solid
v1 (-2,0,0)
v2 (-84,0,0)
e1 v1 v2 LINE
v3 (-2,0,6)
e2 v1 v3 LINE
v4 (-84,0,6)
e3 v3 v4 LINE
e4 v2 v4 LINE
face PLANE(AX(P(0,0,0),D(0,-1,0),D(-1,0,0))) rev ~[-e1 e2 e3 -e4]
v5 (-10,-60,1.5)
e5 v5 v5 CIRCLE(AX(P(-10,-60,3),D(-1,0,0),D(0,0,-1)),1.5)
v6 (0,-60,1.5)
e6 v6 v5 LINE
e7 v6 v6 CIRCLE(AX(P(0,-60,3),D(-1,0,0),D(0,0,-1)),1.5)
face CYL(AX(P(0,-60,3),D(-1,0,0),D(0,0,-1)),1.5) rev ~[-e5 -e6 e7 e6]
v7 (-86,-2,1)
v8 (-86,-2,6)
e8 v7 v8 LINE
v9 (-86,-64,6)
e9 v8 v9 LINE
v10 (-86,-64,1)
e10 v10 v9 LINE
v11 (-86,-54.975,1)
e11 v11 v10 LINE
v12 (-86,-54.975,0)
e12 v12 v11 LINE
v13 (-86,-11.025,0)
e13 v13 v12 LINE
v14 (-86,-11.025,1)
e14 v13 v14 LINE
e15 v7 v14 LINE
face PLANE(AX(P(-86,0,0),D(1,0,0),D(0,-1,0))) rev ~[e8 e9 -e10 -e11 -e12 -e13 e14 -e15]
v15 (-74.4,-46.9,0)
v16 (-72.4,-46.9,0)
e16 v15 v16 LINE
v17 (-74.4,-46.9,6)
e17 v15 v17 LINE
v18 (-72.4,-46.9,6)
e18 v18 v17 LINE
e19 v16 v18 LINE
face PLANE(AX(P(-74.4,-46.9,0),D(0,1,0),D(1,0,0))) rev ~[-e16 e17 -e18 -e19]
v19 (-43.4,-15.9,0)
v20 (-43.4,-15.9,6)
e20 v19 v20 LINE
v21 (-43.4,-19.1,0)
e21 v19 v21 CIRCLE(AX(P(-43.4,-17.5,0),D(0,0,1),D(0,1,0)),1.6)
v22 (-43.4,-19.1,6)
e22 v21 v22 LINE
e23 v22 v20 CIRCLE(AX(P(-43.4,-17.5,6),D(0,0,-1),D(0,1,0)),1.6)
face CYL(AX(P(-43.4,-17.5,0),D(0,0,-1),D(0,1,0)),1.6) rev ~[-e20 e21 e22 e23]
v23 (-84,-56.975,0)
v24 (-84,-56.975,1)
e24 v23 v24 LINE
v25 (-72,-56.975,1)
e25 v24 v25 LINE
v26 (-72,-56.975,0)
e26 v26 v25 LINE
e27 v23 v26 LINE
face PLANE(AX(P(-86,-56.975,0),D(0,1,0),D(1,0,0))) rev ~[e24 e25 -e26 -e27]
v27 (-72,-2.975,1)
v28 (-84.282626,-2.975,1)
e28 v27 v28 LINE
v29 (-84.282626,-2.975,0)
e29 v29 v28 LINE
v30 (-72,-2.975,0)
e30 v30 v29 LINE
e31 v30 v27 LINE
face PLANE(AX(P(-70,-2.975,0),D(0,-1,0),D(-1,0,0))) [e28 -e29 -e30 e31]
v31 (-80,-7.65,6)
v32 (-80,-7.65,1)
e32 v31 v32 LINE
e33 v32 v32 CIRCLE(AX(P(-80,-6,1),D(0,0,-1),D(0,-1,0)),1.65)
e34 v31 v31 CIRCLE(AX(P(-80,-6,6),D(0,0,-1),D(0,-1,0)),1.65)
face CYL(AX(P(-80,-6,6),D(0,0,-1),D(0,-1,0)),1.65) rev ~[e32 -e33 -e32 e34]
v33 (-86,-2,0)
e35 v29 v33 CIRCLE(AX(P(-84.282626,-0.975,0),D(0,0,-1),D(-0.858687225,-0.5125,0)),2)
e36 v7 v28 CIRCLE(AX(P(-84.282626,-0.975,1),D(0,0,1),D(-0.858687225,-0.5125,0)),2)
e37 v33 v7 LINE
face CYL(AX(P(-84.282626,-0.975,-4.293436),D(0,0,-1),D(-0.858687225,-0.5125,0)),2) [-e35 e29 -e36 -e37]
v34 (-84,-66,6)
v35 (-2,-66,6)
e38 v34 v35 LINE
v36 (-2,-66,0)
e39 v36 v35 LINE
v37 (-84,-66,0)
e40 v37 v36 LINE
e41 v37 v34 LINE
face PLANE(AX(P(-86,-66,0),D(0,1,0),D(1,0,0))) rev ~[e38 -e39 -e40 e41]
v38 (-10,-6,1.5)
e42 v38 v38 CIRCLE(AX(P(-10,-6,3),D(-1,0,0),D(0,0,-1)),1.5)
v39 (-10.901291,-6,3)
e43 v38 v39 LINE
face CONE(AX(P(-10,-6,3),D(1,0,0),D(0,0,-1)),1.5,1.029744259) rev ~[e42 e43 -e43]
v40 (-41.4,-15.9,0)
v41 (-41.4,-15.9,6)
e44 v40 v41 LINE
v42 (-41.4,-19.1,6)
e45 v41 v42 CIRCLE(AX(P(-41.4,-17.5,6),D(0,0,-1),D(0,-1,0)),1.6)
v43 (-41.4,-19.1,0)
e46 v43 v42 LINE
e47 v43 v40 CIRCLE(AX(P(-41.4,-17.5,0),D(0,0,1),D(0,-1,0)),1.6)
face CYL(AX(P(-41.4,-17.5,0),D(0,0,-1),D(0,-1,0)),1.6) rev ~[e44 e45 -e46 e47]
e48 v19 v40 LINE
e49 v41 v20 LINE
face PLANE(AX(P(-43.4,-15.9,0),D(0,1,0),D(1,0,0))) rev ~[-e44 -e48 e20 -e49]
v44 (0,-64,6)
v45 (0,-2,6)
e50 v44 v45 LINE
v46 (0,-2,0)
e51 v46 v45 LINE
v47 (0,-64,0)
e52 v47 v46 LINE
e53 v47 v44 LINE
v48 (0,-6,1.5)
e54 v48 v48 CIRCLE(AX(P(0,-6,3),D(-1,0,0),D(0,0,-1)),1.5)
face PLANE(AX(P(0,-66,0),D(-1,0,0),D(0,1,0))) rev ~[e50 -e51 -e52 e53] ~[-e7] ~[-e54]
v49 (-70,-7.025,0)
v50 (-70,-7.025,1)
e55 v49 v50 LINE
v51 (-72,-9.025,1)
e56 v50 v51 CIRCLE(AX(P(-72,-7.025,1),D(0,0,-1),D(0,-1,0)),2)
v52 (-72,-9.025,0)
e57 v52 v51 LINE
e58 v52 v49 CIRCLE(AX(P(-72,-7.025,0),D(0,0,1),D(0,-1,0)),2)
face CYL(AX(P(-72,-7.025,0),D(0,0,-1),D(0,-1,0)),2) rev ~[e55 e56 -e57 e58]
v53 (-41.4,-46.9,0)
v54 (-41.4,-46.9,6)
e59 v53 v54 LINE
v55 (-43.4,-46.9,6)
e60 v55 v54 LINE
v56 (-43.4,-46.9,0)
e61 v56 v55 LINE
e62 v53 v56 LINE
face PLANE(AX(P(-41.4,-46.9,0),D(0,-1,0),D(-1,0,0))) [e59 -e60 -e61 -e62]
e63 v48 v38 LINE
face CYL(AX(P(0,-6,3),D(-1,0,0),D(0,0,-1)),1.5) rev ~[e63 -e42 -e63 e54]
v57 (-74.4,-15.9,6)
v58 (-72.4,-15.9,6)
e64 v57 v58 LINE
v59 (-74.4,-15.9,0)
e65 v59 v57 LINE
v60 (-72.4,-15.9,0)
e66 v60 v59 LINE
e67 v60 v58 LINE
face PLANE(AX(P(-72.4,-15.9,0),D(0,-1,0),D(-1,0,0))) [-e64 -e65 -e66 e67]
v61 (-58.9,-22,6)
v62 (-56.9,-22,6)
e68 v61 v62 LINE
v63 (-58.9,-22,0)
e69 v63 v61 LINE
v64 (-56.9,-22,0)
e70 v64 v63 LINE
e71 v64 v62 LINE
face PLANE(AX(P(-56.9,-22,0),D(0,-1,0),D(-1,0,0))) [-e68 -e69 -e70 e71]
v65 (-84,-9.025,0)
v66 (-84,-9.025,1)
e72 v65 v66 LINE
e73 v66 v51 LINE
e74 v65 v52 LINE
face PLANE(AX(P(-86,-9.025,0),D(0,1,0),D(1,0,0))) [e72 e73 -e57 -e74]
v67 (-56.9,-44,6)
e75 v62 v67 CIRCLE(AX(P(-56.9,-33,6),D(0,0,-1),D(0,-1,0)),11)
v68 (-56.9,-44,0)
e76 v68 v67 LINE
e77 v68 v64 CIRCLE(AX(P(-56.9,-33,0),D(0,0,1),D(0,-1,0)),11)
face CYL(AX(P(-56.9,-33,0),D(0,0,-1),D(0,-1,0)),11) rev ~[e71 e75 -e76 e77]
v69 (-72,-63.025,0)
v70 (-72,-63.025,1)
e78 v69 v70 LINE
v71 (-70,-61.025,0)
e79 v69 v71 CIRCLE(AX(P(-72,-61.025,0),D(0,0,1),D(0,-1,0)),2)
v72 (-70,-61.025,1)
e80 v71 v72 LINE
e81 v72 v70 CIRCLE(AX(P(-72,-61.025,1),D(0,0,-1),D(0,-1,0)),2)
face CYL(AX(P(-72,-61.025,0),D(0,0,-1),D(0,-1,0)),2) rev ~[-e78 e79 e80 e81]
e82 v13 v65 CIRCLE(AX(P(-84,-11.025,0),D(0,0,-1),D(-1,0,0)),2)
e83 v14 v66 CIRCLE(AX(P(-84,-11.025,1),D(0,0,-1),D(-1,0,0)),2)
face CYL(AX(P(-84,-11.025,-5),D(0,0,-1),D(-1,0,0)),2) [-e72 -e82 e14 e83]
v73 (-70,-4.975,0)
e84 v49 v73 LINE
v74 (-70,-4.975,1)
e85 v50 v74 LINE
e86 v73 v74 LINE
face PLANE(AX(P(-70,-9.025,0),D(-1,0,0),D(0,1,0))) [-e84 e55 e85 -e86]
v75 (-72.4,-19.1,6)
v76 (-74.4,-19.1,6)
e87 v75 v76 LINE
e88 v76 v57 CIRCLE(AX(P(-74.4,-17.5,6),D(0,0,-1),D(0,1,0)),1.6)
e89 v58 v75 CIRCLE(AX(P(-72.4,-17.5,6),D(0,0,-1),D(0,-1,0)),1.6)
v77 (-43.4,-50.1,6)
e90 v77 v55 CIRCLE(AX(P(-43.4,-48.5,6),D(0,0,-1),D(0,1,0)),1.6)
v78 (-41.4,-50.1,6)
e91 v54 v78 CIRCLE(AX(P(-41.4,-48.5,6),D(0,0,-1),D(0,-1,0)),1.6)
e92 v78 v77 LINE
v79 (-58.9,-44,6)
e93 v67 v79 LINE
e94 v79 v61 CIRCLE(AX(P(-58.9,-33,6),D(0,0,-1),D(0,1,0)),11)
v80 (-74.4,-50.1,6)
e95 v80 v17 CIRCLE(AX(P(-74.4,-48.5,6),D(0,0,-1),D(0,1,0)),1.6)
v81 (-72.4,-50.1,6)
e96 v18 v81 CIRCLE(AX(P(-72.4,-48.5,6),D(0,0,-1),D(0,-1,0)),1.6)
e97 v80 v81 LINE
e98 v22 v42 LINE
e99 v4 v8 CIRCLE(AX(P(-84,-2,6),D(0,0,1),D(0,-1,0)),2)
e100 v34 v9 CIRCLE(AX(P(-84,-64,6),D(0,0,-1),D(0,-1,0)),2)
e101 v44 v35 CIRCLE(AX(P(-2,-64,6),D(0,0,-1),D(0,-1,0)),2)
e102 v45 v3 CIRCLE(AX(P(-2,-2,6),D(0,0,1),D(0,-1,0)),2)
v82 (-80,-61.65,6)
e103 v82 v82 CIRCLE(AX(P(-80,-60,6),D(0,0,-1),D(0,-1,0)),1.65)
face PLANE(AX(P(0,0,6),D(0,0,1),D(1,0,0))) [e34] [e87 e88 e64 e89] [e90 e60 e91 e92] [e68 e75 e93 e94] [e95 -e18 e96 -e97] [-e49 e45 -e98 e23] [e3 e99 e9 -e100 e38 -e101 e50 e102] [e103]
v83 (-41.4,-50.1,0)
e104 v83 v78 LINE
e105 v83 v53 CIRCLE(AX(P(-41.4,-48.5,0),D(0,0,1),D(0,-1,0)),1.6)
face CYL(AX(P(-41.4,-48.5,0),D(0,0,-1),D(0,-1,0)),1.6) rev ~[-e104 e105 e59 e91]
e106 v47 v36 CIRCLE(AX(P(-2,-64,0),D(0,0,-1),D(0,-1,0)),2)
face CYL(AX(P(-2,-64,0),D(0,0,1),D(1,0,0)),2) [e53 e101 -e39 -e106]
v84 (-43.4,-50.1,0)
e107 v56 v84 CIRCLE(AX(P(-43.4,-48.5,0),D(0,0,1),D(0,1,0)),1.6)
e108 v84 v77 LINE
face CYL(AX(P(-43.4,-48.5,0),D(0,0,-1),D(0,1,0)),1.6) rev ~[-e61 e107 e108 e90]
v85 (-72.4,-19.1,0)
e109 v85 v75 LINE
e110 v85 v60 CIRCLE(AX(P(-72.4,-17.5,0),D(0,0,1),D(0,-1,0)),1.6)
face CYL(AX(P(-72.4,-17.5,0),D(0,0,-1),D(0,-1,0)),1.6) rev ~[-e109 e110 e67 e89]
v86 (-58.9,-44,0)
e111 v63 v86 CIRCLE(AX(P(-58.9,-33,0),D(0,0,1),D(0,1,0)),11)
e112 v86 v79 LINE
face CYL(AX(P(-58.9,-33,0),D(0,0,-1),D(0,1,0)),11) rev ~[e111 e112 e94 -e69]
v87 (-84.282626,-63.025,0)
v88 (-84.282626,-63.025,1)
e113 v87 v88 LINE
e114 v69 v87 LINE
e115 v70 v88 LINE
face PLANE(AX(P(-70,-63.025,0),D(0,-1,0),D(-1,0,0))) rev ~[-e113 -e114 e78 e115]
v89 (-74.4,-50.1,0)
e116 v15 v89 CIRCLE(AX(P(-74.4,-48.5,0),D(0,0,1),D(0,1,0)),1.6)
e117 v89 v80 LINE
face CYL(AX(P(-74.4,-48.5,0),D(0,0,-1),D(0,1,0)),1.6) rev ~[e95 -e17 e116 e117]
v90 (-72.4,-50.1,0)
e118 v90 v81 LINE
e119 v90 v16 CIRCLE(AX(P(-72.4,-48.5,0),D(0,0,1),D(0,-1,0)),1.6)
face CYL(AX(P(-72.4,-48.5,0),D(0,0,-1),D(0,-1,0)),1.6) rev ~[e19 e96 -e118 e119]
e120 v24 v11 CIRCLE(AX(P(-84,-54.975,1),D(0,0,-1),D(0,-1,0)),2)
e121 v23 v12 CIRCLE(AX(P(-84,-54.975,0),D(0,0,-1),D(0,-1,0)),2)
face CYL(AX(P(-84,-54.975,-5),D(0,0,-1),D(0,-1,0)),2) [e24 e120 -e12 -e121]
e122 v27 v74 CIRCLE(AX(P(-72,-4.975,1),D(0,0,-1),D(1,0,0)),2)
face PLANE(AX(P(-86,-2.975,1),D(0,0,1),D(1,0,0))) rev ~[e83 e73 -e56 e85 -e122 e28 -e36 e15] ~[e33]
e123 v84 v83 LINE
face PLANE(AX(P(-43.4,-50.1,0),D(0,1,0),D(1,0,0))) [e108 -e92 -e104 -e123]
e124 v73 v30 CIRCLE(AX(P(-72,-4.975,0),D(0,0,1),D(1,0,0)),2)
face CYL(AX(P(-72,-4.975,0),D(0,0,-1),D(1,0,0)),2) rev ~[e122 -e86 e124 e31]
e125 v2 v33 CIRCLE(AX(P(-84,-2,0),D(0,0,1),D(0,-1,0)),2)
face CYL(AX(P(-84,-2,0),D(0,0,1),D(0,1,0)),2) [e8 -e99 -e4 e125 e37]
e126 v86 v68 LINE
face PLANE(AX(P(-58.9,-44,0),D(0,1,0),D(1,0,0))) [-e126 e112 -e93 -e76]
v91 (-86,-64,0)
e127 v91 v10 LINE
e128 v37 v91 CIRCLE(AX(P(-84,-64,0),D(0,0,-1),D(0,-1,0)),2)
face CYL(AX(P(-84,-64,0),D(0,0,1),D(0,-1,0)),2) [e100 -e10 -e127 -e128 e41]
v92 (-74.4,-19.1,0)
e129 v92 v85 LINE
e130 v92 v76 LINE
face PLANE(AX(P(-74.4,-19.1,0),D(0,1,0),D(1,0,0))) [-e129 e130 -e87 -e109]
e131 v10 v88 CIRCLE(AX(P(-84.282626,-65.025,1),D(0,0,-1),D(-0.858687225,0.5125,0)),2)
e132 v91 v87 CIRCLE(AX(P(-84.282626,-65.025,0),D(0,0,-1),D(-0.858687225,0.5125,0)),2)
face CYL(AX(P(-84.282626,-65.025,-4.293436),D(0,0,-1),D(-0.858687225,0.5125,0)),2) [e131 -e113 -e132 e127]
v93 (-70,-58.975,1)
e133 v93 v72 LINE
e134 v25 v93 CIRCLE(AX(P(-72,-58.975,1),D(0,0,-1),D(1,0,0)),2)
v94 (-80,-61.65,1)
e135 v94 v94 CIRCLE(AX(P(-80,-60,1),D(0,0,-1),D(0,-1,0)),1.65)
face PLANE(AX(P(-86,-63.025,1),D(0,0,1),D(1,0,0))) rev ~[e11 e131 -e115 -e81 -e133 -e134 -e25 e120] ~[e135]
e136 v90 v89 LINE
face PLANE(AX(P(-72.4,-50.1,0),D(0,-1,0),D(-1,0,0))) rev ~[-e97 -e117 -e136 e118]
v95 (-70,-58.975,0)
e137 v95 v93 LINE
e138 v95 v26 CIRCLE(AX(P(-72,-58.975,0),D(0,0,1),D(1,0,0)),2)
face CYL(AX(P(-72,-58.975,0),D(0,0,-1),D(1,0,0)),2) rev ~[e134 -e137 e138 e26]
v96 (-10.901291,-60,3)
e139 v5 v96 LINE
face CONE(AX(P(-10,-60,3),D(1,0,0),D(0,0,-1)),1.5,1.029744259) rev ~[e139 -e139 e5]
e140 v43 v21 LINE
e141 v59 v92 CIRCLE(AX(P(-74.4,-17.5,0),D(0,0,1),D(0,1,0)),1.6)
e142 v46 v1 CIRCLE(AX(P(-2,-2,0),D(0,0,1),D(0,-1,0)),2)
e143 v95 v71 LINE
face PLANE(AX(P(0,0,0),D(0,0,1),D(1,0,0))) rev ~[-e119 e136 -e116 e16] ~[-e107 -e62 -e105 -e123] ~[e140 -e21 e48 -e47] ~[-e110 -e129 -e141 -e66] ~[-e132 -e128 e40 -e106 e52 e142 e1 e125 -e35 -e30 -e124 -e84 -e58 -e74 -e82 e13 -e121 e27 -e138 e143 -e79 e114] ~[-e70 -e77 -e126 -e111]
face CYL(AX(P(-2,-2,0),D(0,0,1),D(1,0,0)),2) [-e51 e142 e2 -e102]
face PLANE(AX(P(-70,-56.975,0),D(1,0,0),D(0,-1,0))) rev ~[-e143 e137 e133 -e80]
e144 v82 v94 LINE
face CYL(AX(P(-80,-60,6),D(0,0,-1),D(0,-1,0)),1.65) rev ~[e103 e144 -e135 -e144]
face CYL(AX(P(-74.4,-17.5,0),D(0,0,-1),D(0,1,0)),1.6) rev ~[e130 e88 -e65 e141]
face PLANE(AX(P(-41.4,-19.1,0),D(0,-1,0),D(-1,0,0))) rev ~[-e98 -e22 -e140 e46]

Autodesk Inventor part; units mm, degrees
ref_plane "YZ Plane" through (0, 0, 0) normal (1, 0, 0) x (0, 1, 0)
sketch "Skizze3" plane through (0, 0, 0) normal (0, 0, 1) x (1, 0, 0)
  line L0 (0, 0) -> (-86, 0)
  line L1 (-86, 0) -> (-86, -66)
  line L2 (-86, -66) -> (0, -66)
  line L3 (0, -66) -> (0, 0)
  line L4 (-57.9, -33) -> (-86, -33) construction
  line L5 (-42.4, -48.5) -> (-73.4, -48.5) construction
  line L6 (-74.4, -48.5) -> (-72.4, -48.5) construction
  line L7 (-74.4, -46.9) -> (-72.4, -46.9)
  line L8 (-72.4, -50.1) -> (-74.4, -50.1)
  arc A0 (-74.4, -46.9) -> (-74.4, -50.1) centre (-74.4, -48.5) ccw
  arc A1 (-72.4, -50.1) -> (-72.4, -46.9) centre (-72.4, -48.5) ccw
  line L9 (-43.4, -48.5) -> (-41.4, -48.5) construction
  line L10 (-43.4, -50.1) -> (-41.4, -50.1)
  line L11 (-41.4, -46.9) -> (-43.4, -46.9)
  arc A2 (-43.4, -46.9) -> (-43.4, -50.1) centre (-43.4, -48.5) ccw
  arc A3 (-41.4, -50.1) -> (-41.4, -46.9) centre (-41.4, -48.5) ccw
  line L12 (-74.4, -19.1) -> (-72.4, -19.1)
  line L13 (-72.4, -15.9) -> (-74.4, -15.9)
  arc A4 (-74.4, -15.9) -> (-74.4, -19.1) centre (-74.4, -17.5) ccw
  arc A5 (-72.4, -19.1) -> (-72.4, -15.9) centre (-72.4, -17.5) ccw
  line L14 (-43.4, -15.9) -> (-41.4, -15.9)
  line L15 (-41.4, -19.1) -> (-43.4, -19.1)
  arc A6 (-43.4, -15.9) -> (-43.4, -19.1) centre (-43.4, -17.5) ccw
  arc A7 (-41.4, -19.1) -> (-41.4, -15.9) centre (-41.4, -17.5) ccw
  line L16 (-58.9, -33) -> (-56.9, -33) construction
  line L17 (-58.9, -44) -> (-56.9, -44)
  line L18 (-56.9, -22) -> (-58.9, -22)
  arc A8 (-58.9, -22) -> (-58.9, -44) centre (-58.9, -33) ccw
  arc A9 (-56.9, -44) -> (-56.9, -22) centre (-56.9, -33) ccw
  point P0 (-57.9, -48.5)
  dimension "d4" = 86
  dimension "d5" = 66
  dimension "d44" = 31
  dimension "d53" = 28.1
  dimension "d54" = 15.5
  dimension "d55" = 1.6
  dimension "d56" = 2
  dimension "d57" = 1.6
  dimension "d58" = 2
  dimension "d59" = 2
  dimension "d60" = 11
extrude "Extrusion3" add sketch "Skizze3" along normal blind 6 contours L3 L2 L1 L0 | L7 A1 L8 A0 | A2 L11 A3 L10 | A4 L13 A5 L12 | L14 A7 L15 A6 | A8 L18 A9 L17
sketch "Skizze4" plane through (0, -66, 0) normal (1, 0, 0) x (0, 0, -1)
  line L0 (0, 0) -> (-6, 0) projected
  line L1 (-3, 0) -> (-3, 70) construction
  line L2 (0, 66) -> (0, 0) projected
  line L3 (0, 66) -> (-6, 66) projected
  point P0 (-3, 60)
  point P1 (-3, 6)
  dimension "d10" = 6
  dimension "d11" = 6
hole "Bohrung1" at (0, -6, 3) at (0, -60, 3) direction (-1, 0, 0) diameter 3 depth 10 tip angle 118
thread "Gewinde2" size "M3x0.5" class "6H" standard "ISO Metric profile" length 8
thread "Gewinde3" size "M3x0.5" class "6H" standard "ISO Metric profile" length 8
sketch "Skizze5" plane through (0, 0, 6) normal (0, 0, 1) x (1, 0, 0)
  line L0 (0, -60) -> (-86, -60) construction
  line L1 (-86, 0) -> (-86, -66) projected
  line L2 (-70, -63.025) -> (-86, -63.025)
  line L3 (-86, -63.025) -> (-86, -56.975)
  line L4 (-86, -56.975) -> (-70, -56.975)
  line L5 (-70, -56.975) -> (-70, -63.025)
  line L6 (0, -66) -> (0, 0) projected
  line L7 (0, -33) -> (-86, -33) construction
  line L8 (-70, -2.975) -> (-86, -2.975)
  line L9 (-86, -2.975) -> (-86, -9.025)
  line L10 (-86, -9.025) -> (-70, -9.025)
  line L11 (-70, -9.025) -> (-70, -2.975)
  point P0 (0, -6)
  point P1 (-80, -60)
  point P2 (-70, -60)
  point P3 (-80, -6)
  point P4 (-86, -2.975)
  point P5 (-86, -9.025)
  dimension "d26" = 6
  dimension "d34" = 16
  dimension "d35" = 6.05
hole "Bohrung2" at (-80, -60, 6) at (-80, -6, 6) direction (0, 0, -1) diameter 3.3 depth 8.1
sketch "Skizze6" plane through (0, 0, 0) normal (0, 0, -1) x (-1, 0, 0)
  line L0 (86, -9.025) -> (70, -9.025) projected
  line L1 (70, -9.025) -> (70, -2.975) projected
  line L2 (70, -2.975) -> (86, -2.975) projected
  line L3 (86, -56.975) -> (70, -56.975) projected
  line L4 (70, -63.025) -> (86, -63.025) projected
  line L5 (70, -56.975) -> (70, -63.025) projected
  line L6 (86, 0) -> (86, -66) projected
  point P0 (0, 0)
  point P1 (80, -6)
extrude "Extrusion5" cut sketch "Skizze6" against normal blind 1
fillet "Rundung3" radius 2 4 edges at (0, -66, 3) (0, 0, 3) (-86, -66, 3) (-86, 0, 3)
fillet "Rundung4" radius 2 8 edges at (-86, -2.975, 0.5) (-86, -9.025, 0.5) (-70, -2.975, 0.5) (-70, -9.025, 0.5) (-86, -56.975, 0.5) (-86, -63.025, 0.5) (-70, -56.975, 0.5) (-70, -63.025, 0.5)
extrude "Extrusion6" cut sketch "Skizze3" along normal blind 10 contours L7 A1 L8 A0 | A2 L11 A3 L10 | A4 L13 A5 L12 | L14 A7 L15 A6 | A8 L18 A9 L17
ref_plane "Arbeitsebene1" through (-73.4, -48.5, 0) normal (-1, 0, 0) x (0, 0, 1)
ref_plane "Arbeitsebene2" through (-42.4, -48.5, 0) normal (-1, 0, 0) x (0, 0, 1)
equation "\"d54\" = 0.5 * d44"
equation "\"d57\" = d55"
properties part number "getriebe_halterung" material "Acryl"
